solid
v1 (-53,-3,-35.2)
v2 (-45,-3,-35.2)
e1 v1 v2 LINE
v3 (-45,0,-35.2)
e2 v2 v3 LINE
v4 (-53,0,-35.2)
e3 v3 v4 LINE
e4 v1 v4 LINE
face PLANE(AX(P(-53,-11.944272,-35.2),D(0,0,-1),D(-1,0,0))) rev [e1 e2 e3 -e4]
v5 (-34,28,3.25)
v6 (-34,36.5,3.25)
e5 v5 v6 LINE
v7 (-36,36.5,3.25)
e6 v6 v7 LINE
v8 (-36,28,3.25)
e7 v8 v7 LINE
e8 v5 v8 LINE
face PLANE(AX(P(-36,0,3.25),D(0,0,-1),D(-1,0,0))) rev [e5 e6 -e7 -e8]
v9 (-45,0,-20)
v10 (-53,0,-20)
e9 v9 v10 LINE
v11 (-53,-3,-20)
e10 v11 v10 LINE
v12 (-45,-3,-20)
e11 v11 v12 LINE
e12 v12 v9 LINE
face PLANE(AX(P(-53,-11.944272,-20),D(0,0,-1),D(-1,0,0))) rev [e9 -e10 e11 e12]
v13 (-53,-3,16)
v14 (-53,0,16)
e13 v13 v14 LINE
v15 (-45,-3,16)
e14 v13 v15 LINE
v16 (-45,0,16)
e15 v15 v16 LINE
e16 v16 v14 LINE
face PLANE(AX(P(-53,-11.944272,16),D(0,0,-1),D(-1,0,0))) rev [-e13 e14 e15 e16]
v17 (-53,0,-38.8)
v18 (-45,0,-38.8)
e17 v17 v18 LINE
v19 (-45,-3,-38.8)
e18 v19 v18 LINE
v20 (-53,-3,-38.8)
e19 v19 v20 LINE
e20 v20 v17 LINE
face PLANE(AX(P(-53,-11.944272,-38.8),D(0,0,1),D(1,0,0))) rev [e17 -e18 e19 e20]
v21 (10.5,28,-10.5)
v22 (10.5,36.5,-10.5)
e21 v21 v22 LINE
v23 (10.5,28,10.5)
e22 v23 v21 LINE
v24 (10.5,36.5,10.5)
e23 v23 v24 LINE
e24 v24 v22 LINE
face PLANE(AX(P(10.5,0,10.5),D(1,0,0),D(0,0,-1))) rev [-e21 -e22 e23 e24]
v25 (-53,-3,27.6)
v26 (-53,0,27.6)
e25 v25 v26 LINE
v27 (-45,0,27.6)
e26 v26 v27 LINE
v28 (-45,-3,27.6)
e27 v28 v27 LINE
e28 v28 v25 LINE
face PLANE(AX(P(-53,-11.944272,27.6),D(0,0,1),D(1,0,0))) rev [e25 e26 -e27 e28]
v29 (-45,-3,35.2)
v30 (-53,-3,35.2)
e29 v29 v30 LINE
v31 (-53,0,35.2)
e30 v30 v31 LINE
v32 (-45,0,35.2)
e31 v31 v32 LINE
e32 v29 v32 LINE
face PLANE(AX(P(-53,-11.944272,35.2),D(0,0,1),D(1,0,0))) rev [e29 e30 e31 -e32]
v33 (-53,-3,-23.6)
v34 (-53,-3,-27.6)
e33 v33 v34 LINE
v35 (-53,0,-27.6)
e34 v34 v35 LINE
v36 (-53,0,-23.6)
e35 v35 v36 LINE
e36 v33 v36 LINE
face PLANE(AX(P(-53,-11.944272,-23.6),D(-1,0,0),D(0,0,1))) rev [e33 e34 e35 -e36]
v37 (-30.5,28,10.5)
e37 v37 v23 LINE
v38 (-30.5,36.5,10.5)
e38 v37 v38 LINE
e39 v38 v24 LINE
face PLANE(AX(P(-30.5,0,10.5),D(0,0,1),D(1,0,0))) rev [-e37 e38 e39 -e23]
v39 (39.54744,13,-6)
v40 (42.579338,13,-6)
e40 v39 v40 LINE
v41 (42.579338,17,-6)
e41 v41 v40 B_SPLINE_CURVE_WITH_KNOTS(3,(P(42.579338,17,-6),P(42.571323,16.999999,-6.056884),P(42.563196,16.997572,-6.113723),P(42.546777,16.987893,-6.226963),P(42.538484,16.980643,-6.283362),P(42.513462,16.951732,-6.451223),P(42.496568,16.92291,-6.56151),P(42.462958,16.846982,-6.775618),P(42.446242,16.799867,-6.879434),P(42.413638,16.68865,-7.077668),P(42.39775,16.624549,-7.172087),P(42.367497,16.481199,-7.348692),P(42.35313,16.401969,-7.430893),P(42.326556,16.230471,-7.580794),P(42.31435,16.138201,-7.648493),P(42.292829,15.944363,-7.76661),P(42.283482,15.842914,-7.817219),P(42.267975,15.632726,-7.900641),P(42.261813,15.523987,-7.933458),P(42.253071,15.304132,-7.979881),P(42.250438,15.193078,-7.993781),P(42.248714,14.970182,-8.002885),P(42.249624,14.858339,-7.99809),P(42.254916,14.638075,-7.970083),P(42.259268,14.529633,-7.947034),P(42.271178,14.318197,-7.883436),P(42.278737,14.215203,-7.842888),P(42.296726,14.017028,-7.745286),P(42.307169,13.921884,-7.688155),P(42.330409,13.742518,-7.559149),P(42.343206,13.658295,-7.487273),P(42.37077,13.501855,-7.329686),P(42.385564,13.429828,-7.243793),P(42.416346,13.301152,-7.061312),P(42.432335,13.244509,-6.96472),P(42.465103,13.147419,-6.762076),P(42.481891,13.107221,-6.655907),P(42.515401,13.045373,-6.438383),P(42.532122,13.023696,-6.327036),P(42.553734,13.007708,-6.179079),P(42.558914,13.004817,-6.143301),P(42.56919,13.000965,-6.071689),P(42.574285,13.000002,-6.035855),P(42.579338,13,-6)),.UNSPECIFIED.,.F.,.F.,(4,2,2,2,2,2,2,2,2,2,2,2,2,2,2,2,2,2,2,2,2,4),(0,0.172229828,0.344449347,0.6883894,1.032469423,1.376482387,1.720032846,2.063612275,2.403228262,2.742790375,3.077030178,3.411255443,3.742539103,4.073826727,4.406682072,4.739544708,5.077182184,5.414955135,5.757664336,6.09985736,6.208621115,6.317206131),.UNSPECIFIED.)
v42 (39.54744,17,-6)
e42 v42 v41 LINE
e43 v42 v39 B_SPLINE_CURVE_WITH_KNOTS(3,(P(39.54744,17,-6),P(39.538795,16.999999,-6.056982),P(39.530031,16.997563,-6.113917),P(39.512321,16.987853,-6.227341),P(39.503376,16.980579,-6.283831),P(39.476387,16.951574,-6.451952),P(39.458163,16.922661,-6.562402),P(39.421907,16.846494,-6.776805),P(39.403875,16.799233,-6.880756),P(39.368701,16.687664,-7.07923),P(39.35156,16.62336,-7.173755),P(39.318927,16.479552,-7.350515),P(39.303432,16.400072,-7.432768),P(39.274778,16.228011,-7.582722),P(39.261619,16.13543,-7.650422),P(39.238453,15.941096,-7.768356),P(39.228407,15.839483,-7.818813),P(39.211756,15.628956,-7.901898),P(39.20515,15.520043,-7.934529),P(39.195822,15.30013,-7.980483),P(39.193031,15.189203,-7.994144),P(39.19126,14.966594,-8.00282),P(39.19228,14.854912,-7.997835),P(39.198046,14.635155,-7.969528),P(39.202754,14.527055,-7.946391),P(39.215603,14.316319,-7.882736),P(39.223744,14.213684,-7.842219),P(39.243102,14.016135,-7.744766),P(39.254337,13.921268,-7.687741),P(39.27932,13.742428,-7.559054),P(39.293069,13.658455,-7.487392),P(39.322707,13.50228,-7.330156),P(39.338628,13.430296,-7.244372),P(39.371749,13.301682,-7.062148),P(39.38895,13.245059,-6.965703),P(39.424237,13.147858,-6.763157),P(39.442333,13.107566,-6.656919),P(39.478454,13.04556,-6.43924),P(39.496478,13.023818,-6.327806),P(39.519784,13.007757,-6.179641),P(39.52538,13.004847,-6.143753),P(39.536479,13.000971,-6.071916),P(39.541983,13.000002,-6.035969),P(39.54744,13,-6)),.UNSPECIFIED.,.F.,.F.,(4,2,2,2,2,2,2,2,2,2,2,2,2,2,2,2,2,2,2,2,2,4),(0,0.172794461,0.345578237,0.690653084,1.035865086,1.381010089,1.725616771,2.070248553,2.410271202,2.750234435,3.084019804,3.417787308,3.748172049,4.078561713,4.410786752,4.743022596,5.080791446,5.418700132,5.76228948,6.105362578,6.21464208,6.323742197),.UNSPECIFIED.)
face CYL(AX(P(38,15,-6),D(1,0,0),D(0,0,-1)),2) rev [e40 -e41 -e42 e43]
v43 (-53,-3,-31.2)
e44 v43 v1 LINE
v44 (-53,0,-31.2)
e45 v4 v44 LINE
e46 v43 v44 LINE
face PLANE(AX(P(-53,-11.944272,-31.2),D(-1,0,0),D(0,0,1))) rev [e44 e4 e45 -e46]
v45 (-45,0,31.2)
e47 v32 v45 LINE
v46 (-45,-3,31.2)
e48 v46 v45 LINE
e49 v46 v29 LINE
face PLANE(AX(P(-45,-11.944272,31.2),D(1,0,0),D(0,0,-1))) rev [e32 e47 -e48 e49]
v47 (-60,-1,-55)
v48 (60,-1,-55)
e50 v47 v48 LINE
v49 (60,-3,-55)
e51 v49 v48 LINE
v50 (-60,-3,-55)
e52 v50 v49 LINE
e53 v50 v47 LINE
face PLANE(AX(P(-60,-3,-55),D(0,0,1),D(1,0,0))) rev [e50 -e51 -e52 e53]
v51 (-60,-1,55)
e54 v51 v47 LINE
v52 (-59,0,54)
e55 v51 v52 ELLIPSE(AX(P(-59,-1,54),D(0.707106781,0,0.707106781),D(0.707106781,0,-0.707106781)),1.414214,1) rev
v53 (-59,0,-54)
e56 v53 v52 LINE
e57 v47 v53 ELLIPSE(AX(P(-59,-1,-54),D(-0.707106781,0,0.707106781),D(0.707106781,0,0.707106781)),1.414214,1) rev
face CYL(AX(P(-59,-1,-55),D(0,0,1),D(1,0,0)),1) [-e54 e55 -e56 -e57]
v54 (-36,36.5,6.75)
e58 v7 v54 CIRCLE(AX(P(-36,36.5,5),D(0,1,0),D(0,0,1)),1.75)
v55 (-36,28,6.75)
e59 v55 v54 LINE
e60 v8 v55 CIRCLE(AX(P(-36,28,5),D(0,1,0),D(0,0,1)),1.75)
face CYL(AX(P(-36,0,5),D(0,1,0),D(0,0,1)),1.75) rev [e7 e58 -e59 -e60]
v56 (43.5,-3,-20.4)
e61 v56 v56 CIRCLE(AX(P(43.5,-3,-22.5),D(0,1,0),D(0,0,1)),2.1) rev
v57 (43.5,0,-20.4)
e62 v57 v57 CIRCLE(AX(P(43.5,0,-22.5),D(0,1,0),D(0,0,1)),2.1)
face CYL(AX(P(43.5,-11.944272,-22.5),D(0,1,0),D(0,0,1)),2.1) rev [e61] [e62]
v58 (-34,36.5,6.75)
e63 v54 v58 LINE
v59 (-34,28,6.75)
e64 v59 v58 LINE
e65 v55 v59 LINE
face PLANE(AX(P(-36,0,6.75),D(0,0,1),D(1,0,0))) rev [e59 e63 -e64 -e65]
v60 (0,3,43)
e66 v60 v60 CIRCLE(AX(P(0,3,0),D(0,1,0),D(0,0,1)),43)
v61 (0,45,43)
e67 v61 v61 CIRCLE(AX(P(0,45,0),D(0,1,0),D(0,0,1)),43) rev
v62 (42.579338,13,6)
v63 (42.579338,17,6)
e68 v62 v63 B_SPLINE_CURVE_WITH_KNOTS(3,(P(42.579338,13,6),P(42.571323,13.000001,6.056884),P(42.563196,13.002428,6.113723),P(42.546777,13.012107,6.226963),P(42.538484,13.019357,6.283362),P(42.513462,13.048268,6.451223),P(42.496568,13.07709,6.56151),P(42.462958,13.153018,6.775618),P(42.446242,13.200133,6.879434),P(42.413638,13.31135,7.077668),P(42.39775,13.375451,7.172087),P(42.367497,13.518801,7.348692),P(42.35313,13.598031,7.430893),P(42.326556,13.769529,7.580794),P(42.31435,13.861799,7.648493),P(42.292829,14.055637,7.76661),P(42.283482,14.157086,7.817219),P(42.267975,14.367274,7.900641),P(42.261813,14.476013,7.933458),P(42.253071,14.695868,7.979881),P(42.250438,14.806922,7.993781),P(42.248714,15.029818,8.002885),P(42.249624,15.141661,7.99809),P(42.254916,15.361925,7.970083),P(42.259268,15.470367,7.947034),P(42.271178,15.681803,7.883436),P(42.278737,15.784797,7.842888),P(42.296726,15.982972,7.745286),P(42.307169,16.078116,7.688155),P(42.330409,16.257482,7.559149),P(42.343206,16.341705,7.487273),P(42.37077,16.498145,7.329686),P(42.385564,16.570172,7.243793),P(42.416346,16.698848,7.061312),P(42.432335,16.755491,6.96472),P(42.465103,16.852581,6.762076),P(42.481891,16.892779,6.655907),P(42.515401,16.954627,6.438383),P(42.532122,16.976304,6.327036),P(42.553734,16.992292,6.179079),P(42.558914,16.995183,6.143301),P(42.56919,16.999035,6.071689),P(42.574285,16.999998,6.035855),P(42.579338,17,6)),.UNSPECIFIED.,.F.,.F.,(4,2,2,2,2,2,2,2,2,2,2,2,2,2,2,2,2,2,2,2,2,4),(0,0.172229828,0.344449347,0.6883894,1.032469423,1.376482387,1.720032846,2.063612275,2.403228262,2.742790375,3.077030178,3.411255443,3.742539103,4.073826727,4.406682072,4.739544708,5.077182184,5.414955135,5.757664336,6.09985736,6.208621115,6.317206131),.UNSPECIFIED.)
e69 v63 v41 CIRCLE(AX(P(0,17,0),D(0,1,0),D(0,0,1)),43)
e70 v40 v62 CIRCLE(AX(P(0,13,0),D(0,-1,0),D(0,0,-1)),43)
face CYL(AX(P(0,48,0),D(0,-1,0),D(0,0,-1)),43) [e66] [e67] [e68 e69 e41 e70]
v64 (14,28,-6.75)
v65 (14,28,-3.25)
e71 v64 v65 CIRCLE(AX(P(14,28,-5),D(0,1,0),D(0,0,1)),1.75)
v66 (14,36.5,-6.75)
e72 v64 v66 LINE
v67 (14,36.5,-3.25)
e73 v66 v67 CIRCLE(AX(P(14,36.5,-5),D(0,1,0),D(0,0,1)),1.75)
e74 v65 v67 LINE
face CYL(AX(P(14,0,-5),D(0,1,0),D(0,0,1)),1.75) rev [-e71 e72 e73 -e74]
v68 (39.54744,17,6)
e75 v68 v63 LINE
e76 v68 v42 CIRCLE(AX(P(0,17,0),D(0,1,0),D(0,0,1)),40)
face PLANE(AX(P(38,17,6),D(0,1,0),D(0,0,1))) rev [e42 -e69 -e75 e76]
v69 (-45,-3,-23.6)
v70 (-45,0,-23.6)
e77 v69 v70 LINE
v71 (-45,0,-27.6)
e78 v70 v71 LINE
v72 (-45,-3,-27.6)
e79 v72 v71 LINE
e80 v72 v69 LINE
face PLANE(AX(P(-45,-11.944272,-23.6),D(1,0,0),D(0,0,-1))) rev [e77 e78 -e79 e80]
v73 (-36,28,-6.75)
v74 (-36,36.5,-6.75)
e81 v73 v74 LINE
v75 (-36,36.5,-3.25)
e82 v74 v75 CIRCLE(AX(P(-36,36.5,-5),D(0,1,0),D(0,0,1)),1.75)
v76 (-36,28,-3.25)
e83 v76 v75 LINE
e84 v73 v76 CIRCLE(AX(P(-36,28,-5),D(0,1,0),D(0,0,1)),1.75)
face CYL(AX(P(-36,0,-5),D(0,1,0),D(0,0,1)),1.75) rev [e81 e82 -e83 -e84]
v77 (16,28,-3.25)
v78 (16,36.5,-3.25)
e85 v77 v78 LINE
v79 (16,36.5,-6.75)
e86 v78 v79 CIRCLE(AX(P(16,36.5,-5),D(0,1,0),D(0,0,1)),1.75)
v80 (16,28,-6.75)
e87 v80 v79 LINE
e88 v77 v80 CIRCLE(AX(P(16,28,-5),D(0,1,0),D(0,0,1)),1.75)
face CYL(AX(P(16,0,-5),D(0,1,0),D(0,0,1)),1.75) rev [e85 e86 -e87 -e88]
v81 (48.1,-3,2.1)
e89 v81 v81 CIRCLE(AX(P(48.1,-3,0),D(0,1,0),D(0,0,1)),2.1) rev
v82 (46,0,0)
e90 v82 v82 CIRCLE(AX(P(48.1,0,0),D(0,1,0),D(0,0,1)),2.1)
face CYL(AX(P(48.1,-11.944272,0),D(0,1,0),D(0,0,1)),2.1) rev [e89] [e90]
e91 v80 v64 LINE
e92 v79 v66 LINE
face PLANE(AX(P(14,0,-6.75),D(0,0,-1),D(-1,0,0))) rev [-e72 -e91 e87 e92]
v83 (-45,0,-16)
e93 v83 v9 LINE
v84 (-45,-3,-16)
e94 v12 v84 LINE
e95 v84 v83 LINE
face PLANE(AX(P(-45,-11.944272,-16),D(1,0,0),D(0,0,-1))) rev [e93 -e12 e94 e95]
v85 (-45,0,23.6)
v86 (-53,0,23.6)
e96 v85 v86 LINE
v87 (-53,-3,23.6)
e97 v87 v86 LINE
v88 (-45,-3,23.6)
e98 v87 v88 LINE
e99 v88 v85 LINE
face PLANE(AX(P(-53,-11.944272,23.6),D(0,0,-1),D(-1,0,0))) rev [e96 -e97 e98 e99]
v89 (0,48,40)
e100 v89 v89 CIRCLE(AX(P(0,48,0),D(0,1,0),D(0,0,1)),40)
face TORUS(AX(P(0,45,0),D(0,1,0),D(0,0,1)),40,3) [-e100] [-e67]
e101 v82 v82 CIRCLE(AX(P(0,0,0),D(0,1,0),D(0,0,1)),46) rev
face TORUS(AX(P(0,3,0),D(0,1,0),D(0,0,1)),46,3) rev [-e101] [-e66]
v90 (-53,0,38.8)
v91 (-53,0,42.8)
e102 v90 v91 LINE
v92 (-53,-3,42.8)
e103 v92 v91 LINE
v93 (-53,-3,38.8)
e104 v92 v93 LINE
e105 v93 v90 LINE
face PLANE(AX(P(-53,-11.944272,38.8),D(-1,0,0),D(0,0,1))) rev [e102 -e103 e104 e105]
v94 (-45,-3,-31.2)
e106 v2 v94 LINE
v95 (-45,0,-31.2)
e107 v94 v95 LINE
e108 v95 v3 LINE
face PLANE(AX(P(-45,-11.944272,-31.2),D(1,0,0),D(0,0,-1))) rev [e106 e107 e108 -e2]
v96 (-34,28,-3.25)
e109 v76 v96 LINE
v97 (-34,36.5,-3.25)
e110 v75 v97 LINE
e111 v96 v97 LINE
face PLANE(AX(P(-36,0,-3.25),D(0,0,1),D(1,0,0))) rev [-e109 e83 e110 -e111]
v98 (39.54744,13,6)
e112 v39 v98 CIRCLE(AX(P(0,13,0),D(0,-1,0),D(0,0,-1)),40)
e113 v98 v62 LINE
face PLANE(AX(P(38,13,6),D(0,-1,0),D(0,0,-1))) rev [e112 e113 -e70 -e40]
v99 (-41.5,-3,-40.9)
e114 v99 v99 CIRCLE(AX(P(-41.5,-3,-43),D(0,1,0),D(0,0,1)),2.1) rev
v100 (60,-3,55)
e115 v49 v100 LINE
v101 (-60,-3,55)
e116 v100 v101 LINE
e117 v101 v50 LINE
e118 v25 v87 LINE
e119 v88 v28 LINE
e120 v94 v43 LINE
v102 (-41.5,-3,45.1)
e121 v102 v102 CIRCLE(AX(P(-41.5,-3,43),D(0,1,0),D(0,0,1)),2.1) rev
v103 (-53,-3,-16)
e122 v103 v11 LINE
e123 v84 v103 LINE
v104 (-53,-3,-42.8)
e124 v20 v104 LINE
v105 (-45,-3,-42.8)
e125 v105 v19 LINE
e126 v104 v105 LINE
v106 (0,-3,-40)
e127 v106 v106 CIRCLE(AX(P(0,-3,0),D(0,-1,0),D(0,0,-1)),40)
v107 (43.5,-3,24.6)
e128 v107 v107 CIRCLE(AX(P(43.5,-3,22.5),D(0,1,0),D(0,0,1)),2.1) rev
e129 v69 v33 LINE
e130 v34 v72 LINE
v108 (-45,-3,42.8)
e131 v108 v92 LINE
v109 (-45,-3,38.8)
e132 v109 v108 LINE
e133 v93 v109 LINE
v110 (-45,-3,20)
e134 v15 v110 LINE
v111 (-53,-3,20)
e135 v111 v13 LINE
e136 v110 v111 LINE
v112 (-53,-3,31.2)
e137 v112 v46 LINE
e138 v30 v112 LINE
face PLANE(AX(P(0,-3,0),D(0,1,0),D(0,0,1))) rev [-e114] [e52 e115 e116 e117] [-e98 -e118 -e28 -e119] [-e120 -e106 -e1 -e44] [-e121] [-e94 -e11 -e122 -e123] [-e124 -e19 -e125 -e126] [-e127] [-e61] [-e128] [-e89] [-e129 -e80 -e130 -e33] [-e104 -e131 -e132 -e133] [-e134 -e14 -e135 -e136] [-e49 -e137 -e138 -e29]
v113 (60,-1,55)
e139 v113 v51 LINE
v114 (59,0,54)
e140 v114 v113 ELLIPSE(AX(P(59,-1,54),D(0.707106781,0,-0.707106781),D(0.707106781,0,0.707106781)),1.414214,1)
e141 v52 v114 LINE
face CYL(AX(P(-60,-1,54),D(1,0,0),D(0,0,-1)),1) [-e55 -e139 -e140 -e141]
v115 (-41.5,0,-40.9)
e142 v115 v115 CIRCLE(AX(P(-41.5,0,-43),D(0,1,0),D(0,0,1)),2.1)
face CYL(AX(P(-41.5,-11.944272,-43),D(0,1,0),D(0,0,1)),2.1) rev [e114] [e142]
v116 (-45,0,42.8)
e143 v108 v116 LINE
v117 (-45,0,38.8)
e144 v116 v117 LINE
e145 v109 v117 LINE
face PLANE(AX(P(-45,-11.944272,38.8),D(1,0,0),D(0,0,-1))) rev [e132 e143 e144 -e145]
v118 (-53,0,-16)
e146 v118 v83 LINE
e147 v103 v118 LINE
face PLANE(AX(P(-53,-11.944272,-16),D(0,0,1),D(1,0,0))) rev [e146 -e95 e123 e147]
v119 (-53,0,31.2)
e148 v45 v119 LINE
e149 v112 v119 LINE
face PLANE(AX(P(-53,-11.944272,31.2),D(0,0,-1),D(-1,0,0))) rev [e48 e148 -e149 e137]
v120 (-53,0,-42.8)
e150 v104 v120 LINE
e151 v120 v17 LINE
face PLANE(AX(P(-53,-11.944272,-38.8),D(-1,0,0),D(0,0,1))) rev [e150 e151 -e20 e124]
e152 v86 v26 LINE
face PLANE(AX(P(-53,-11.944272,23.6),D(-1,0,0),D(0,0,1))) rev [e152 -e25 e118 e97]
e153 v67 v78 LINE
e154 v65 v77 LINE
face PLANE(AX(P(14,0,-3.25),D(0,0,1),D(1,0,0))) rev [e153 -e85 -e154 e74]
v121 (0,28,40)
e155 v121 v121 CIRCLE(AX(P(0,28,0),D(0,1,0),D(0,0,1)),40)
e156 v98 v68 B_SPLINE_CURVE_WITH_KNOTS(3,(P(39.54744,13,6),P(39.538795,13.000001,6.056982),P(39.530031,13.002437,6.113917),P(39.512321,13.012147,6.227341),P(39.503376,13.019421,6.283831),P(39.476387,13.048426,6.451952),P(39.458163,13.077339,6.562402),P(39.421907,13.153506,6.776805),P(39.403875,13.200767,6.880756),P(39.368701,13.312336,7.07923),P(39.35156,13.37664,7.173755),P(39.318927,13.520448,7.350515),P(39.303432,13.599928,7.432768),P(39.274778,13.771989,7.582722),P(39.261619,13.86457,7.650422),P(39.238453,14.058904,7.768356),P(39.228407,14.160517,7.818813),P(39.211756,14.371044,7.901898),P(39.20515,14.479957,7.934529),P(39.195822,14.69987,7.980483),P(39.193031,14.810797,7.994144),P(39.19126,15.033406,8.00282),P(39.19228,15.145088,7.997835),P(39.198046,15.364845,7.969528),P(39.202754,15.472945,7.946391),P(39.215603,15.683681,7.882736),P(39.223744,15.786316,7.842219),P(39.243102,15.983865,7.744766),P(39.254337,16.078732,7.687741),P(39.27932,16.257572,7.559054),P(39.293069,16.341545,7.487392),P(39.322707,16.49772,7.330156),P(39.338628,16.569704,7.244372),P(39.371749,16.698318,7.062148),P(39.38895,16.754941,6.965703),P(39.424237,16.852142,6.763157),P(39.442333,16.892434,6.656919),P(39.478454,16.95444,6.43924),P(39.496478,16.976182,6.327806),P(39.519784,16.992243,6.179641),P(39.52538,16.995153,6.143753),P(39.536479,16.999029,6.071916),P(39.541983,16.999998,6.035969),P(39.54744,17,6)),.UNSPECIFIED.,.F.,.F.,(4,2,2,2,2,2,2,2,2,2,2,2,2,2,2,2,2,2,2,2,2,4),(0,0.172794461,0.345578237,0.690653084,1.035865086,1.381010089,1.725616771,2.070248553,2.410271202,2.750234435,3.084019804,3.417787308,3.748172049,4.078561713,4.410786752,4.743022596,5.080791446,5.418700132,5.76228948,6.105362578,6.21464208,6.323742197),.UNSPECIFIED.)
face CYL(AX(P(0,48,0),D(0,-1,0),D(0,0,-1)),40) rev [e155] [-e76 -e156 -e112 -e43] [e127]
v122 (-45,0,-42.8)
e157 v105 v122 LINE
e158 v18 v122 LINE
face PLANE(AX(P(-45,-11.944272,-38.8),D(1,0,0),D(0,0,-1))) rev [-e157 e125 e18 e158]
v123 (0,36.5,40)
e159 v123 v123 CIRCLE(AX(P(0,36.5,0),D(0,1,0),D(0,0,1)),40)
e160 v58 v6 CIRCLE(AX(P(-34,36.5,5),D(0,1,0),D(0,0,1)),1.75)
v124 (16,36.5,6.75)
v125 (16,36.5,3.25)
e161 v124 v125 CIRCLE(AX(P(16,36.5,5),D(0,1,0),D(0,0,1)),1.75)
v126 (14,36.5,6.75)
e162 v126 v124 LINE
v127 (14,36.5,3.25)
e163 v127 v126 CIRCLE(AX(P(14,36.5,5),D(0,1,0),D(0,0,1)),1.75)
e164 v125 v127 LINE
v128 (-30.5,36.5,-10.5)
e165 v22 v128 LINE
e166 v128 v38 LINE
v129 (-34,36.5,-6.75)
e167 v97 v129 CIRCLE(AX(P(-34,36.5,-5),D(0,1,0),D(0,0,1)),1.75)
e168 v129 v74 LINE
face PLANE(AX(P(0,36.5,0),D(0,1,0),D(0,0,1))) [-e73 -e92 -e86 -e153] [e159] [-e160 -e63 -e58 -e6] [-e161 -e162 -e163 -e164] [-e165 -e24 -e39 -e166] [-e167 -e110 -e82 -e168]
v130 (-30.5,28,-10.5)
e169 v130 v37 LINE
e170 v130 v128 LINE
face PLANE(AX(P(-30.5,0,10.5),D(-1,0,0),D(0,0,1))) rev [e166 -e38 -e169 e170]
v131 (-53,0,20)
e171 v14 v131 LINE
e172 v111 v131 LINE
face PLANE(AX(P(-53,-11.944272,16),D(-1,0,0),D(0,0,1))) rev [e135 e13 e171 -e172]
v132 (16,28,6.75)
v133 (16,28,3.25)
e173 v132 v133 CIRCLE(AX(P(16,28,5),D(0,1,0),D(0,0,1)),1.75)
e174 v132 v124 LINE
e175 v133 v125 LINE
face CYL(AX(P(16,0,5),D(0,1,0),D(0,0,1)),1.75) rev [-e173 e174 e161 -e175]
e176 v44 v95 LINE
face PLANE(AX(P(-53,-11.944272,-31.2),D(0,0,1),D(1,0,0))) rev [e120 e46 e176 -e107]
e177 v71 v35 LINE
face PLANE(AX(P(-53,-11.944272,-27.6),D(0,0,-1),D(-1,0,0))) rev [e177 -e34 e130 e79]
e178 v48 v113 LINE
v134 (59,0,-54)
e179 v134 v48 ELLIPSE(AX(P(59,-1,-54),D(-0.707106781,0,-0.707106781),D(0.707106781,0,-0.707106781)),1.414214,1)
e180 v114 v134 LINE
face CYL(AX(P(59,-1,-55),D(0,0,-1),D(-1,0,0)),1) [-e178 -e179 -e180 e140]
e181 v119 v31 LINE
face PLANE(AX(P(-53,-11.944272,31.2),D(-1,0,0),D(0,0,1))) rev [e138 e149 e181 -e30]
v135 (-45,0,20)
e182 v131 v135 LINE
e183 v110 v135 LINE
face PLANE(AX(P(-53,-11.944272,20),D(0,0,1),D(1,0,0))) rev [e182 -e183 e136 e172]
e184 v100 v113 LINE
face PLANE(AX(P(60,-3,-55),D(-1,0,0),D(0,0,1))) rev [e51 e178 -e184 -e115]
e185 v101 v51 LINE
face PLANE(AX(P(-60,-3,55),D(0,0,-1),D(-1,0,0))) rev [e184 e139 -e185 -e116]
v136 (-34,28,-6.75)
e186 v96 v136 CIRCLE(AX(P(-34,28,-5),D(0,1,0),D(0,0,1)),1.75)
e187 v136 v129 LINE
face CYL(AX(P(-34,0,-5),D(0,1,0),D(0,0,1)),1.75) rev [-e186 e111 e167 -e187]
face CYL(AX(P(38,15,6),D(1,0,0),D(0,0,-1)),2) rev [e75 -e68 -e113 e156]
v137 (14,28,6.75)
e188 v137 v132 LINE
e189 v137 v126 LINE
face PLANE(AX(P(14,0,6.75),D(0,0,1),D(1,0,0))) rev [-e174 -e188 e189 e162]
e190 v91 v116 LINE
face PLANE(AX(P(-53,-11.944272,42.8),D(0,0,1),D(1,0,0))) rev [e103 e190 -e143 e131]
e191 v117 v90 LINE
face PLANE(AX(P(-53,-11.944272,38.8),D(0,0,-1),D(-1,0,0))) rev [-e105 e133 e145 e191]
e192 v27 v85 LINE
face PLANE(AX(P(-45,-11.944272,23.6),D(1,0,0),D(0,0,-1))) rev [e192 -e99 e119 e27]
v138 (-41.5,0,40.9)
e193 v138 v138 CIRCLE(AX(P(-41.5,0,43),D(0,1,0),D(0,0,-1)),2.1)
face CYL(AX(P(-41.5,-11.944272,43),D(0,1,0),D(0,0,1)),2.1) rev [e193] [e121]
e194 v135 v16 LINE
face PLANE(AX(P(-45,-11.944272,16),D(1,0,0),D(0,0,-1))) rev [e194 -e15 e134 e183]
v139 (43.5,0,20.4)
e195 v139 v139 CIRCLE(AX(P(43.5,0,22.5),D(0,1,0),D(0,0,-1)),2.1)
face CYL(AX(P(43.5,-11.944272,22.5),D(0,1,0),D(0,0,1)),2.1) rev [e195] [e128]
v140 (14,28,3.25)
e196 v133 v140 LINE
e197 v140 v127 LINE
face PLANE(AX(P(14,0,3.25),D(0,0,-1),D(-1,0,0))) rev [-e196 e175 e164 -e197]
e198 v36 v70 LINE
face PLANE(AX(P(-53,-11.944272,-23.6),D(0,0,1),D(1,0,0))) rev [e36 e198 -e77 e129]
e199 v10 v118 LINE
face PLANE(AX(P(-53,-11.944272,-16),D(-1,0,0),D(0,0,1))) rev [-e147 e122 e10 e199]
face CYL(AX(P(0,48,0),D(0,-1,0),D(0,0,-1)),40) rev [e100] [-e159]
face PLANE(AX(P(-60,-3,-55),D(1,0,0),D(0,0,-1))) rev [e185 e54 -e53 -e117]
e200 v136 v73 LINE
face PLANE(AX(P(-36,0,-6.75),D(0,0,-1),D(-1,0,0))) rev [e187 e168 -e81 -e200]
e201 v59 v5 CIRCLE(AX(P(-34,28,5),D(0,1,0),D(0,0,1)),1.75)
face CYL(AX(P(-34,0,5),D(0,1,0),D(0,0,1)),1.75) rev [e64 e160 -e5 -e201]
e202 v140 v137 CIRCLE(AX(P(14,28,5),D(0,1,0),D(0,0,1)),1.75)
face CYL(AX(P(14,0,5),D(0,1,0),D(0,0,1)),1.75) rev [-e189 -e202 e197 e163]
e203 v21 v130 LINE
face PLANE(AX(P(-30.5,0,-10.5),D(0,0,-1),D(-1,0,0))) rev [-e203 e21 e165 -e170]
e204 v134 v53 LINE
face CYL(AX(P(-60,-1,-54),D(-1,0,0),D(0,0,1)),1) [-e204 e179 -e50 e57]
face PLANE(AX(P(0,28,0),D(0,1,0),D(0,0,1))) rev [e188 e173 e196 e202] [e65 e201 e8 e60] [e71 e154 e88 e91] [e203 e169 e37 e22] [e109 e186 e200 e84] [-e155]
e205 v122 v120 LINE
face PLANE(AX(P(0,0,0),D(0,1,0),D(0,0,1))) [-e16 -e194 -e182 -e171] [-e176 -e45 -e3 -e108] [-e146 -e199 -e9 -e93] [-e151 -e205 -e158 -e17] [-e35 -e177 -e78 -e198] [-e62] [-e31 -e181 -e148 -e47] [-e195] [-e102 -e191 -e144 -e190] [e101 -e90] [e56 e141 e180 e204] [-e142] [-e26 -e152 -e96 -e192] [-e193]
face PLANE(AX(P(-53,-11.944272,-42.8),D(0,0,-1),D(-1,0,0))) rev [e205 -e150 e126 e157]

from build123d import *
from OCP.BRepFilletAPI import BRepFilletAPI_MakeFillet
from build123d.topology import SkipClean

# Parameters (mm, degrees)
SKETCH2_R               = 43
SKETCH2_R_2             = 40
BOSS_EXTRUDE1_DEPTH     = 48
SKETCH3_R               = 40
BOSS_EXTRUDE2_DEPTH     = 8.5
CUT_EXTRUDE1_DEPTH      = 71.924255371
CUT_EXTRUDE1_DEPTH_BACK = 71.924255371
SKETCH4_W               = 41
SKETCH4_H               = 21
CUT_EXTRUDE2_DEPTH      = 5
BOSS_EXTRUDE3_START     = 3
SKETCH6_W               = 120
SKETCH6_H               = 110
SKETCH6_R               = 40
BOSS_EXTRUDE3_DEPTH     = 3
FILLET1_R               = 3
FILLET1_R_2             = 1
SKETCH7_R               = 2.1
SKETCH7_W               = 8
SKETCH7_H               = 4
CUT_EXTRUDE3_DEPTH      = 3


with BuildPart() as part:
    # Sketch2 → Boss-Extrude1 (new body)
    with BuildSketch(Plane(origin=(0, 0, 0), x_dir=(1, 0, 0), z_dir=(0, 1, 0))):
        with Locations(Location((0, 0, 0), (0, 0, 270))):
            Circle(SKETCH2_R)
        with Locations(Location((0, 0, 0), (0, 0, 270))):
            Circle(SKETCH2_R_2, mode=Mode.SUBTRACT)
    extrude(amount=BOSS_EXTRUDE1_DEPTH)

    # Sketch3 → Boss-Extrude2 (add)
    with BuildSketch(Plane(origin=(0, 28, 0), x_dir=(1, 0, 0), z_dir=(0, 1, 0))):
        with Locations(Location((0, 0, 0), (0, 0, 270))):
            Circle(SKETCH3_R)
    extrude(amount=BOSS_EXTRUDE2_DEPTH)

    # Sketch4 → Cut-Extrude1 (cut, two sides: drawn at the far end of the back side and taken through both)
    with BuildSketch(Plane(origin=(0, 36.5, 0), x_dir=(1, 0, 0), z_dir=(0, 1, 0)).offset(-CUT_EXTRUDE1_DEPTH_BACK)):
        with BuildLine():
            Line((14, 6.75), (16, 6.75))
            ThreePointArc((16, 6.75), (17.75, 5), (16, 3.25))
            Line((16, 3.25), (14, 3.25))
            ThreePointArc((14, 3.25), (12.25, 5), (14, 6.75))
        make_face()
        with Locations((-10, 0)):
            Rectangle(SKETCH4_W, SKETCH4_H)
        with BuildLine():
            Line((-36, 6.75), (-34, 6.75))
            ThreePointArc((-34, 6.75), (-32.25, 5), (-34, 3.25))
            Line((-34, 3.25), (-36, 3.25))
            ThreePointArc((-36, 3.25), (-37.75, 5), (-36, 6.75))
        make_face()
        with BuildLine():
            Line((-36, -3.25), (-34, -3.25))
            ThreePointArc((-34, -3.25), (-32.25, -5), (-34, -6.75))
            Line((-34, -6.75), (-36, -6.75))
            ThreePointArc((-36, -6.75), (-37.75, -5), (-36, -3.25))
        make_face()
        with BuildLine():
            Line((14, -6.75), (16, -6.75))
            ThreePointArc((16, -6.75), (17.75, -5), (16, -3.25))
            Line((16, -3.25), (14, -3.25))
            ThreePointArc((14, -3.25), (12.25, -5), (14, -6.75))
        make_face()
    extrude(amount=CUT_EXTRUDE1_DEPTH + CUT_EXTRUDE1_DEPTH_BACK, mode=Mode.SUBTRACT)

    # Sketch5 → Cut-Extrude2 (cut)
    with BuildSketch(Plane(origin=(43, 0, 0), x_dir=(0, 0, -1), z_dir=(1, 0, 0))):
        with BuildLine():
            Line((-6, 17), (6, 17))
            ThreePointArc((6, 17), (8, 15), (6, 13))
            Line((6, 13), (-6, 13))
            ThreePointArc((-6, 13), (-8, 15), (-6, 17))
        make_face()
    extrude(amount=-CUT_EXTRUDE2_DEPTH, mode=Mode.SUBTRACT)

    # Sketch6 → Boss-Extrude3 (add)
    with SkipClean():  # the faces are left unmerged after this step: merging them gives an invalid solid
        with BuildSketch(Plane.XZ.offset(BOSS_EXTRUDE3_START)):
            Rectangle(SKETCH6_W, SKETCH6_H)
            with Locations(Location((0, 0, 0), (0, 0, 270))):
                Circle(SKETCH6_R, mode=Mode.SUBTRACT)
        extrude(amount=-BOSS_EXTRUDE3_DEPTH)

    # Fillet1
    fillet1_edges_1 = [part.edges().sort_by_distance(p)[0] for p in [
        (0, 48, -43),
        (0, 0, -43),
    ]]
    fillet1_edges_2 = [part.edges().sort_by_distance(p)[0] for p in [
        (0, 0, 55),
        (60, 0, 0),
        (-60, 0, 0),
        (0, 0, -55),
    ]]
    fillet1 = BRepFilletAPI_MakeFillet(part.part.solid().wrapped)
    for e in fillet1_edges_1:
        fillet1.Add(FILLET1_R - 0.0001, e.wrapped)
    for e in fillet1_edges_2:
        fillet1.Add(FILLET1_R_2 - 0.0001, e.wrapped)
    add(Compound.cast(fillet1.Shape()), mode=Mode.REPLACE)  # a hair under: the kernel refuses the full size

    # Sketch7 → Cut-Extrude3 (cut)
    with BuildSketch(Plane(origin=(0, 0, 0), x_dir=(1, 0, 0), z_dir=(0, 1, 0))):
        with Locations(Location((-41.5, 43, 0), (0, 0, 270))):
            Circle(SKETCH7_R)
        with Locations(Location((43.5, 22.5, 0), (0, 0, 270))):
            Circle(SKETCH7_R)
        with Locations(Location((43.5, -22.5, 0), (0, 0, 270))):
            Circle(SKETCH7_R)
        with Locations(Location((-41.5, -43, 0), (0, 0, 270))):
            Circle(SKETCH7_R)
        with Locations(Location((48.1, 0, 0), (0, 0, 270))):
            Circle(SKETCH7_R)
        with Locations((-49, 25.6)):
            Rectangle(SKETCH7_W, SKETCH7_H)
        with Locations((-49, 18)):
            Rectangle(SKETCH7_W, SKETCH7_H)
        with Locations((-49, 33.2)):
            Rectangle(SKETCH7_W, SKETCH7_H)
        with Locations((-49, 40.8)):
            Rectangle(SKETCH7_W, SKETCH7_H)
        with Locations((-49, -40.8)):
            Rectangle(SKETCH7_W, SKETCH7_H)
        with Locations((-49, -33.2)):
            Rectangle(SKETCH7_W, SKETCH7_H)
        with Locations((-49, -25.6)):
            Rectangle(SKETCH7_W, SKETCH7_H)
        with Locations((-49, -18)):
            Rectangle(SKETCH7_W, SKETCH7_H)
    extrude(amount=-CUT_EXTRUDE3_DEPTH, mode=Mode.SUBTRACT)


solid = part.part
